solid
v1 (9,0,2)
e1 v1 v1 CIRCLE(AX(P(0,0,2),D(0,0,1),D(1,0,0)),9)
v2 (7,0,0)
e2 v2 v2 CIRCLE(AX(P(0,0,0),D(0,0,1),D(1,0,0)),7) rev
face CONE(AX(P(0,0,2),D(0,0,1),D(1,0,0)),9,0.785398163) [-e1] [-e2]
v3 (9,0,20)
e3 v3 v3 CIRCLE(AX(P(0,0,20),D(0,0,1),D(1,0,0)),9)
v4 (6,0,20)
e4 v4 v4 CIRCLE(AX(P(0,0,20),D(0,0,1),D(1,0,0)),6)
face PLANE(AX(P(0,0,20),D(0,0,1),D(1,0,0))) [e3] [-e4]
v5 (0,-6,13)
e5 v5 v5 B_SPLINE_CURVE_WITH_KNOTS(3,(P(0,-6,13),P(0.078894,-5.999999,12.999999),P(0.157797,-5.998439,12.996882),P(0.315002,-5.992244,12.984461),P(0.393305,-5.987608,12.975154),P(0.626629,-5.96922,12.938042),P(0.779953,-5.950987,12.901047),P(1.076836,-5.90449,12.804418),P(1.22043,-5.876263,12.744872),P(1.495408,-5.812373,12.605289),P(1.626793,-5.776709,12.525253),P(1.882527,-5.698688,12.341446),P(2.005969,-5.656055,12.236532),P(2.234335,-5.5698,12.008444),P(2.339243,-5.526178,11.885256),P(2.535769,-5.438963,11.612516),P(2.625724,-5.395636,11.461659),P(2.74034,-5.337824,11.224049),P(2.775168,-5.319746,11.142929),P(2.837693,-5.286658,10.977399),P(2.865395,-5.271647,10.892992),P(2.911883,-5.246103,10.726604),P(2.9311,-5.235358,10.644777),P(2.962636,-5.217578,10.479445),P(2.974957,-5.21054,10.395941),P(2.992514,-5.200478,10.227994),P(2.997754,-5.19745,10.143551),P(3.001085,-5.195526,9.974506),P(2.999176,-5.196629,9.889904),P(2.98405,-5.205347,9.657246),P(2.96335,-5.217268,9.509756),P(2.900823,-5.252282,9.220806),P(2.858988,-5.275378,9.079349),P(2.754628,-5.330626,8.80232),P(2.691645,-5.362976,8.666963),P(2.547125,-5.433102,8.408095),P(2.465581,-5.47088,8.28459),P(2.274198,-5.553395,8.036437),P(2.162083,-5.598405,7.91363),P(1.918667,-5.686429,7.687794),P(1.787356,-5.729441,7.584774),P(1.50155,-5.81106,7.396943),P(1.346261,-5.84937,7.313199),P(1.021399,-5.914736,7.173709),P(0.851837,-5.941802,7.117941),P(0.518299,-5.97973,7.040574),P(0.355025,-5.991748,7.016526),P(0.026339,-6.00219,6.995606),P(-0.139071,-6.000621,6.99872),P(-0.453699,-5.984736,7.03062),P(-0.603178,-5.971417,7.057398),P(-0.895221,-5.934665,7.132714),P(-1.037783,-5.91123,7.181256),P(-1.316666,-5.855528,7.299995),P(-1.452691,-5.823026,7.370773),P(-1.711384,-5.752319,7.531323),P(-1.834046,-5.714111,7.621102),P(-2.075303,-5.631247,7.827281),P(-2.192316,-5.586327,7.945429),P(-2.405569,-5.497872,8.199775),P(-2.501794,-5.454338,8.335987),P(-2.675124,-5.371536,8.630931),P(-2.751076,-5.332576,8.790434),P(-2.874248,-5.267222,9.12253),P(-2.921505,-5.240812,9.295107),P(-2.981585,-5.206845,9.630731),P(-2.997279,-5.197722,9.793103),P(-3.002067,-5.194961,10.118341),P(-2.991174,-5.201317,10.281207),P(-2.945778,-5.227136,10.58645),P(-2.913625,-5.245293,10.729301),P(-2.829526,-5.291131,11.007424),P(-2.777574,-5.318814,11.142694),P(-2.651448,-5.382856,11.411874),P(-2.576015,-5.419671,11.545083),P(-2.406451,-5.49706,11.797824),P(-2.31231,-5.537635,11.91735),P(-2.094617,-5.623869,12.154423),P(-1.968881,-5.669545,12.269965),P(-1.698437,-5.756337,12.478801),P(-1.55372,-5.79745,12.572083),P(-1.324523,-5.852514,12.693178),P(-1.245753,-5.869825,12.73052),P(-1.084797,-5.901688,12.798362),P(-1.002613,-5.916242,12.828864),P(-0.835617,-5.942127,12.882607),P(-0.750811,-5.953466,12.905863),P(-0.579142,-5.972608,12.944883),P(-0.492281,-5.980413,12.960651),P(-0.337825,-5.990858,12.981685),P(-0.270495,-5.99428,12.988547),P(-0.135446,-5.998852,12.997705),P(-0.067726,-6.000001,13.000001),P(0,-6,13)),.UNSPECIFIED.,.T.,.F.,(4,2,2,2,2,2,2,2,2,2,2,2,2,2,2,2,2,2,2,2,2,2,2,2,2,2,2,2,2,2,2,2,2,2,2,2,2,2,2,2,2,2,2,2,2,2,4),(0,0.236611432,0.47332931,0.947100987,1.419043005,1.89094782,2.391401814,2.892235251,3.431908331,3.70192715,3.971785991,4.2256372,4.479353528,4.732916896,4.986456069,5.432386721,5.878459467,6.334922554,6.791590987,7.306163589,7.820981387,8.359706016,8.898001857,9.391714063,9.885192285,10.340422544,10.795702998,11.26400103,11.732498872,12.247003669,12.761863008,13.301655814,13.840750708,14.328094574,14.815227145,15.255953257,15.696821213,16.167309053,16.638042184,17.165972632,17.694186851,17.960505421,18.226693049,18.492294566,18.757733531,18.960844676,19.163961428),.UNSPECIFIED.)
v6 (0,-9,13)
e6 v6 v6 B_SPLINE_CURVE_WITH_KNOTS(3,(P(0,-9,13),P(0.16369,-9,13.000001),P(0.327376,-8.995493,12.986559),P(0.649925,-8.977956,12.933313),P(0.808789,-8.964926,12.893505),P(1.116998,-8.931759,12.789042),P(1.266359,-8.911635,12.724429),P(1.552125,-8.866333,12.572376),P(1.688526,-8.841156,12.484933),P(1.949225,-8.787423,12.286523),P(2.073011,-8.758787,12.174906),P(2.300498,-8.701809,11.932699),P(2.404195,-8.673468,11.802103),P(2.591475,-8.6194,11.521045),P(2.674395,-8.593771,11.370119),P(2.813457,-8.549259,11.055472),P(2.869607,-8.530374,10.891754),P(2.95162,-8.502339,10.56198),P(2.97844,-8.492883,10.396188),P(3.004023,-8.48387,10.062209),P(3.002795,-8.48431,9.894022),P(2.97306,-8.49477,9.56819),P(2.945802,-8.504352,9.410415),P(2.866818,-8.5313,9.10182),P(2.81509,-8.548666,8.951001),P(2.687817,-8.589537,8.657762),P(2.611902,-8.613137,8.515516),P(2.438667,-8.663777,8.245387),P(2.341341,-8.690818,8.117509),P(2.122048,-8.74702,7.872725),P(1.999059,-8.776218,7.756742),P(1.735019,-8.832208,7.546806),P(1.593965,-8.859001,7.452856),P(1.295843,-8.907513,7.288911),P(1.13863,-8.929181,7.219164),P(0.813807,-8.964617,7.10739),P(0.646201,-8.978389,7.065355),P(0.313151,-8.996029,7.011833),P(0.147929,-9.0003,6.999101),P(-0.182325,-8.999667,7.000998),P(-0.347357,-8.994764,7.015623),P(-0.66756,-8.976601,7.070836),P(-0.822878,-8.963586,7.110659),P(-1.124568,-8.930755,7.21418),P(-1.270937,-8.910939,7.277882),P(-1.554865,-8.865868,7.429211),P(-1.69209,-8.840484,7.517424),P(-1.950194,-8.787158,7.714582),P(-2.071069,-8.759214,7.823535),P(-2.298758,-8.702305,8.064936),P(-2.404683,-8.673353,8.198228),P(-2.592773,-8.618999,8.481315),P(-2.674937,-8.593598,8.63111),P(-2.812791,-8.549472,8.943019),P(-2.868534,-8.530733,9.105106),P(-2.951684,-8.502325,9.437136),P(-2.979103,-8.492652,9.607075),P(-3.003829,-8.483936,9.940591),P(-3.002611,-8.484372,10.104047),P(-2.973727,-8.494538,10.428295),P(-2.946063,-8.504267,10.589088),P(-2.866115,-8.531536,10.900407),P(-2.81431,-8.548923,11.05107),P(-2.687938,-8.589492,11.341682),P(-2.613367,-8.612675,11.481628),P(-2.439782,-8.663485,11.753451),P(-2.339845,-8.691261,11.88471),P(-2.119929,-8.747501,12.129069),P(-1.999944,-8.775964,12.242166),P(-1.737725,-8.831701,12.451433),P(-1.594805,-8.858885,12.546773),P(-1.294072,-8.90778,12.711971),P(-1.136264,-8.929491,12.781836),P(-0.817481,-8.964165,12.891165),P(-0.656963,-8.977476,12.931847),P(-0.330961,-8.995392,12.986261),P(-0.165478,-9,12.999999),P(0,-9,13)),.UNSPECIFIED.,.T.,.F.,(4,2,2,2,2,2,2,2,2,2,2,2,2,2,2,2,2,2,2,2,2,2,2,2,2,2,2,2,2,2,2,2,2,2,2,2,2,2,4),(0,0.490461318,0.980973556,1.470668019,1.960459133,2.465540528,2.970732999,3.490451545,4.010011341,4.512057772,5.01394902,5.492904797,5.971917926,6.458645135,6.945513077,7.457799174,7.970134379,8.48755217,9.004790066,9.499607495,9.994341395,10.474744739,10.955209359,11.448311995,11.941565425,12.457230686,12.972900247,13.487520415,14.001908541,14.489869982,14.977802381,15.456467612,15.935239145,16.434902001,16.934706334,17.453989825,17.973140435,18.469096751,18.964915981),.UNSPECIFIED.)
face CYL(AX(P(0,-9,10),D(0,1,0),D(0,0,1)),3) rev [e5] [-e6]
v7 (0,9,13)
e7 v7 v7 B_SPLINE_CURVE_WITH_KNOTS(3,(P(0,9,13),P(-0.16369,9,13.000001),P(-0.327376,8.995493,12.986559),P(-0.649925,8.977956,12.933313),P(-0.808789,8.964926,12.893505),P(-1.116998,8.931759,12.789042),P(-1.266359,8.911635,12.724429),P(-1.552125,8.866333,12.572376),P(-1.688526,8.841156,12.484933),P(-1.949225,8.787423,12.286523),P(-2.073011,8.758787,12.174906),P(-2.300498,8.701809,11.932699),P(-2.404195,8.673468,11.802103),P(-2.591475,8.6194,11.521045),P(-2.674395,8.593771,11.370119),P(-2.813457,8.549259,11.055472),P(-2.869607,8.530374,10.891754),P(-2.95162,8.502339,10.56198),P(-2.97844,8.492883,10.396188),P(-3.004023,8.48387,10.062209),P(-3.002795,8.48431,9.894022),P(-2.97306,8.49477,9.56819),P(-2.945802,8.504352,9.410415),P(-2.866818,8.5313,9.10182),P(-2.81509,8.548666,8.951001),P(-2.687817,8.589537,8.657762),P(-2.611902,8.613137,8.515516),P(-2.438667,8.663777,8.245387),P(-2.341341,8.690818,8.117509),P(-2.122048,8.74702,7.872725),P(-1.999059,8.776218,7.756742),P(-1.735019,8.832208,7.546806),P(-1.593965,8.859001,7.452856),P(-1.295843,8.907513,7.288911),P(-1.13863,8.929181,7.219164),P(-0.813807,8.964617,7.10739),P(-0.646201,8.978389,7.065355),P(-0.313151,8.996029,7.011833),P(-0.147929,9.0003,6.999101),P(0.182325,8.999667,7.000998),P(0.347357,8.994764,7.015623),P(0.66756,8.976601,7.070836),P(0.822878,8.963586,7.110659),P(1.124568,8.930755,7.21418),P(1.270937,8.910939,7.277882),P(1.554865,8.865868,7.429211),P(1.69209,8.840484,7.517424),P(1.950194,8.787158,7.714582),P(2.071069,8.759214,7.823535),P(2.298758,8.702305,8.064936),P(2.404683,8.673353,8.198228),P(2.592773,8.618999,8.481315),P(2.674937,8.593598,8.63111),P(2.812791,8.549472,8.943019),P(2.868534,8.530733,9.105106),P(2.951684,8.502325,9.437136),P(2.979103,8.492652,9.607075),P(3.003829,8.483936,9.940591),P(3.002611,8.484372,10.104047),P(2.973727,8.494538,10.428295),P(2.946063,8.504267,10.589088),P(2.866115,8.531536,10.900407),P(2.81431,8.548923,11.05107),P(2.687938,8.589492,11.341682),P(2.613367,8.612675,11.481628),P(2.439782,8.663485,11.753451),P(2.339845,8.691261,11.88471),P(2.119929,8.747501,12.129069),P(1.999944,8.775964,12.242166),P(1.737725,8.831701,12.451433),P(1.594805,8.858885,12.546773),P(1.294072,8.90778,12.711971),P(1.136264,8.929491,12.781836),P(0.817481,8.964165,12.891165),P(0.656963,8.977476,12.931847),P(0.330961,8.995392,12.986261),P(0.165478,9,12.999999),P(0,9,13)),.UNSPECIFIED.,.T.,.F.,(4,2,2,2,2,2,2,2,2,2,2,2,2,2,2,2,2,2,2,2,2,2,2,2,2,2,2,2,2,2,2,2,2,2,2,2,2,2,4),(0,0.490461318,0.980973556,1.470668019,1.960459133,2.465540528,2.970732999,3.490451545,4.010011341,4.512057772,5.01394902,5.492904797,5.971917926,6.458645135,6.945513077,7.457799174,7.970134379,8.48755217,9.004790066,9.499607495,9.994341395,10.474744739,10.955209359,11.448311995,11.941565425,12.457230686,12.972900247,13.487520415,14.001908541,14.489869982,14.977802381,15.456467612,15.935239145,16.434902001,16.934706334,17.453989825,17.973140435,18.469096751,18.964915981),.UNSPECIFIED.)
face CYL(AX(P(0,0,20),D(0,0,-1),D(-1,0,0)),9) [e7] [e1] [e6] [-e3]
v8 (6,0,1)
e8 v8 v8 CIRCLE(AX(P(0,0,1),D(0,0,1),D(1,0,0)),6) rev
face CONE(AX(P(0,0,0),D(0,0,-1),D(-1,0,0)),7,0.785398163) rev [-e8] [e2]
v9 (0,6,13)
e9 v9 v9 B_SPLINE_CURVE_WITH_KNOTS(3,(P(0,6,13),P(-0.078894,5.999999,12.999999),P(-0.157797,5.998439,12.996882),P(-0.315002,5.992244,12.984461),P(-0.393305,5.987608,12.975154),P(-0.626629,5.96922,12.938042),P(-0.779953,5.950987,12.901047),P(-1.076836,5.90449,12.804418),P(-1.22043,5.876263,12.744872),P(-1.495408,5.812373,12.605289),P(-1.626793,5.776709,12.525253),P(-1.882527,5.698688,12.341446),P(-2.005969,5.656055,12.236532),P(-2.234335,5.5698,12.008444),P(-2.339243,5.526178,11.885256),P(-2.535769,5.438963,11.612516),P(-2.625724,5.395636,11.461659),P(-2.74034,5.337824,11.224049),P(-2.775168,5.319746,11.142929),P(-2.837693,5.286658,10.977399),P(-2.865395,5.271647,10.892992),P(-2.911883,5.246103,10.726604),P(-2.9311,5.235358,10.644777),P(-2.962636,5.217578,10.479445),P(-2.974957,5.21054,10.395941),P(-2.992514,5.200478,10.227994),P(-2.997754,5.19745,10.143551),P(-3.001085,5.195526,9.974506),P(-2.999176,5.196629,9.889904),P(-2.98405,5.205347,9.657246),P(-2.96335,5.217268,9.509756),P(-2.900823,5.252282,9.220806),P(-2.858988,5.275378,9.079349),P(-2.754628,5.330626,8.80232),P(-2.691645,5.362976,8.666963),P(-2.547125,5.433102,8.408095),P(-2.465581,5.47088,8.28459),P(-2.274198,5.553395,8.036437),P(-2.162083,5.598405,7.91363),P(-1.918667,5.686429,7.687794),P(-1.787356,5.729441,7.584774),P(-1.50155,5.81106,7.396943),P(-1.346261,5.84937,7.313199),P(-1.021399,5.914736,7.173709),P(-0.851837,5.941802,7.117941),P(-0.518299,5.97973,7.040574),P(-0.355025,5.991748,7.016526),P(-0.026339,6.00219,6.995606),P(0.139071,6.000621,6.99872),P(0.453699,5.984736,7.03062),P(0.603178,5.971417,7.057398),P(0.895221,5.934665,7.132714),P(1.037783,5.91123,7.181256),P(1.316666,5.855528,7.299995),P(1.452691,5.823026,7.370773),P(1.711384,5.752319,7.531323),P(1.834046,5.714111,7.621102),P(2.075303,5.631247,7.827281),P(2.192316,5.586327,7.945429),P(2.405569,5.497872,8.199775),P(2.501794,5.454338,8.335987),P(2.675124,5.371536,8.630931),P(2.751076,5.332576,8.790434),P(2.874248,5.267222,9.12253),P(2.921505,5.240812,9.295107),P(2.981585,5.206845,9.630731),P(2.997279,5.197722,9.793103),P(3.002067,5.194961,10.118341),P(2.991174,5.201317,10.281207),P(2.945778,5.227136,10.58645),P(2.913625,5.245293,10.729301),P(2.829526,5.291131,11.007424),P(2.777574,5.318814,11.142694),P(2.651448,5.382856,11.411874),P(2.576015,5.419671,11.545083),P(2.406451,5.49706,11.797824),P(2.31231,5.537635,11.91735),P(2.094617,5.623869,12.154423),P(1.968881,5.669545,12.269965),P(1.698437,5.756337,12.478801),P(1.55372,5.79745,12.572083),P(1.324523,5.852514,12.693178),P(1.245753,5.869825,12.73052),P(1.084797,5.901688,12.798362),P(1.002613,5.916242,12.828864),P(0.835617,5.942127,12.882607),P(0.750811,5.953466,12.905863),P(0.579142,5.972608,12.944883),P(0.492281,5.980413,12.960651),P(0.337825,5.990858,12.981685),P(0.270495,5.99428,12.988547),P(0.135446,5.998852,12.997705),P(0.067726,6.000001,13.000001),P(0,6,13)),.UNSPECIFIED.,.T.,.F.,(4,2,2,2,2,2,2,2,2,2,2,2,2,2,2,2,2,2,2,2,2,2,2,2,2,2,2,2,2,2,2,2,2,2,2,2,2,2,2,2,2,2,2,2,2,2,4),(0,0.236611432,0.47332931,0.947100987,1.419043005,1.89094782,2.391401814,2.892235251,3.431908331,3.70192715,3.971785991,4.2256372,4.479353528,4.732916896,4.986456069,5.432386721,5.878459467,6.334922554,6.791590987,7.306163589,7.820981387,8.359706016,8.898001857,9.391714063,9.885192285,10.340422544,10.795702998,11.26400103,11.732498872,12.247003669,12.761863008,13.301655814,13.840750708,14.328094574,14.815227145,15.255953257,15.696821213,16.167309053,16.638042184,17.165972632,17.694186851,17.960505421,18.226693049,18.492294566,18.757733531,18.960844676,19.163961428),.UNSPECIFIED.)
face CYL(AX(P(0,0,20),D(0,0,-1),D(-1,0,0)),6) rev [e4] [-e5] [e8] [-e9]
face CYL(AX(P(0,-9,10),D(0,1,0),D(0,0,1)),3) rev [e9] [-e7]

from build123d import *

# Parameters (mm, degrees)
ESQUISSE1_R                  = 9
ESQUISSE1_R_2                = 6
BASE_EXTRUSION_DEPTH         = 20
CHANFREIN1_SIZE              = 2
ENL_V_MAT_EXTRU_1_DEPTH      = 20
ENL_V_MAT_EXTRU_1_DEPTH_BACK = 24.706539182
ESQUISSE2_R                  = 3
CHANFREIN2_SIZE              = 1


with BuildPart() as part:
    # Esquisse1 → Base-Extrusion (new body)
    with BuildSketch(Plane.XY):
        Circle(ESQUISSE1_R)
        Circle(ESQUISSE1_R_2, mode=Mode.SUBTRACT)
    extrude(amount=BASE_EXTRUSION_DEPTH)

    # Chanfrein1
    chanfrein1_edges = [part.edges().sort_by_distance(p)[0] for p in [
        (-9, 0, 0),
    ]]
    chamfer(chanfrein1_edges, length=CHANFREIN1_SIZE - 0.0001)  # a hair under: the kernel refuses the full size

    # Esquisse2 → Enlèv. mat.-Extru.1 (cut, two sides: drawn at the far end of the back side and taken through both)
    with BuildSketch(Plane(origin=(0, 0, 0), x_dir=(1, 0, 0), z_dir=(0, 1, 0)).offset(-ENL_V_MAT_EXTRU_1_DEPTH_BACK)):
        with Locations(Location((0, -10, 0), (0, 0, 270))):
            Circle(ESQUISSE2_R)
    extrude(amount=ENL_V_MAT_EXTRU_1_DEPTH + ENL_V_MAT_EXTRU_1_DEPTH_BACK, mode=Mode.SUBTRACT)

    # Chanfrein2
    chanfrein2_edges = [part.edges().sort_by_distance(p)[0] for p in [
        (-6, 0, 0),
    ]]
    chamfer(chanfrein2_edges, length=CHANFREIN2_SIZE)


solid = part.part
